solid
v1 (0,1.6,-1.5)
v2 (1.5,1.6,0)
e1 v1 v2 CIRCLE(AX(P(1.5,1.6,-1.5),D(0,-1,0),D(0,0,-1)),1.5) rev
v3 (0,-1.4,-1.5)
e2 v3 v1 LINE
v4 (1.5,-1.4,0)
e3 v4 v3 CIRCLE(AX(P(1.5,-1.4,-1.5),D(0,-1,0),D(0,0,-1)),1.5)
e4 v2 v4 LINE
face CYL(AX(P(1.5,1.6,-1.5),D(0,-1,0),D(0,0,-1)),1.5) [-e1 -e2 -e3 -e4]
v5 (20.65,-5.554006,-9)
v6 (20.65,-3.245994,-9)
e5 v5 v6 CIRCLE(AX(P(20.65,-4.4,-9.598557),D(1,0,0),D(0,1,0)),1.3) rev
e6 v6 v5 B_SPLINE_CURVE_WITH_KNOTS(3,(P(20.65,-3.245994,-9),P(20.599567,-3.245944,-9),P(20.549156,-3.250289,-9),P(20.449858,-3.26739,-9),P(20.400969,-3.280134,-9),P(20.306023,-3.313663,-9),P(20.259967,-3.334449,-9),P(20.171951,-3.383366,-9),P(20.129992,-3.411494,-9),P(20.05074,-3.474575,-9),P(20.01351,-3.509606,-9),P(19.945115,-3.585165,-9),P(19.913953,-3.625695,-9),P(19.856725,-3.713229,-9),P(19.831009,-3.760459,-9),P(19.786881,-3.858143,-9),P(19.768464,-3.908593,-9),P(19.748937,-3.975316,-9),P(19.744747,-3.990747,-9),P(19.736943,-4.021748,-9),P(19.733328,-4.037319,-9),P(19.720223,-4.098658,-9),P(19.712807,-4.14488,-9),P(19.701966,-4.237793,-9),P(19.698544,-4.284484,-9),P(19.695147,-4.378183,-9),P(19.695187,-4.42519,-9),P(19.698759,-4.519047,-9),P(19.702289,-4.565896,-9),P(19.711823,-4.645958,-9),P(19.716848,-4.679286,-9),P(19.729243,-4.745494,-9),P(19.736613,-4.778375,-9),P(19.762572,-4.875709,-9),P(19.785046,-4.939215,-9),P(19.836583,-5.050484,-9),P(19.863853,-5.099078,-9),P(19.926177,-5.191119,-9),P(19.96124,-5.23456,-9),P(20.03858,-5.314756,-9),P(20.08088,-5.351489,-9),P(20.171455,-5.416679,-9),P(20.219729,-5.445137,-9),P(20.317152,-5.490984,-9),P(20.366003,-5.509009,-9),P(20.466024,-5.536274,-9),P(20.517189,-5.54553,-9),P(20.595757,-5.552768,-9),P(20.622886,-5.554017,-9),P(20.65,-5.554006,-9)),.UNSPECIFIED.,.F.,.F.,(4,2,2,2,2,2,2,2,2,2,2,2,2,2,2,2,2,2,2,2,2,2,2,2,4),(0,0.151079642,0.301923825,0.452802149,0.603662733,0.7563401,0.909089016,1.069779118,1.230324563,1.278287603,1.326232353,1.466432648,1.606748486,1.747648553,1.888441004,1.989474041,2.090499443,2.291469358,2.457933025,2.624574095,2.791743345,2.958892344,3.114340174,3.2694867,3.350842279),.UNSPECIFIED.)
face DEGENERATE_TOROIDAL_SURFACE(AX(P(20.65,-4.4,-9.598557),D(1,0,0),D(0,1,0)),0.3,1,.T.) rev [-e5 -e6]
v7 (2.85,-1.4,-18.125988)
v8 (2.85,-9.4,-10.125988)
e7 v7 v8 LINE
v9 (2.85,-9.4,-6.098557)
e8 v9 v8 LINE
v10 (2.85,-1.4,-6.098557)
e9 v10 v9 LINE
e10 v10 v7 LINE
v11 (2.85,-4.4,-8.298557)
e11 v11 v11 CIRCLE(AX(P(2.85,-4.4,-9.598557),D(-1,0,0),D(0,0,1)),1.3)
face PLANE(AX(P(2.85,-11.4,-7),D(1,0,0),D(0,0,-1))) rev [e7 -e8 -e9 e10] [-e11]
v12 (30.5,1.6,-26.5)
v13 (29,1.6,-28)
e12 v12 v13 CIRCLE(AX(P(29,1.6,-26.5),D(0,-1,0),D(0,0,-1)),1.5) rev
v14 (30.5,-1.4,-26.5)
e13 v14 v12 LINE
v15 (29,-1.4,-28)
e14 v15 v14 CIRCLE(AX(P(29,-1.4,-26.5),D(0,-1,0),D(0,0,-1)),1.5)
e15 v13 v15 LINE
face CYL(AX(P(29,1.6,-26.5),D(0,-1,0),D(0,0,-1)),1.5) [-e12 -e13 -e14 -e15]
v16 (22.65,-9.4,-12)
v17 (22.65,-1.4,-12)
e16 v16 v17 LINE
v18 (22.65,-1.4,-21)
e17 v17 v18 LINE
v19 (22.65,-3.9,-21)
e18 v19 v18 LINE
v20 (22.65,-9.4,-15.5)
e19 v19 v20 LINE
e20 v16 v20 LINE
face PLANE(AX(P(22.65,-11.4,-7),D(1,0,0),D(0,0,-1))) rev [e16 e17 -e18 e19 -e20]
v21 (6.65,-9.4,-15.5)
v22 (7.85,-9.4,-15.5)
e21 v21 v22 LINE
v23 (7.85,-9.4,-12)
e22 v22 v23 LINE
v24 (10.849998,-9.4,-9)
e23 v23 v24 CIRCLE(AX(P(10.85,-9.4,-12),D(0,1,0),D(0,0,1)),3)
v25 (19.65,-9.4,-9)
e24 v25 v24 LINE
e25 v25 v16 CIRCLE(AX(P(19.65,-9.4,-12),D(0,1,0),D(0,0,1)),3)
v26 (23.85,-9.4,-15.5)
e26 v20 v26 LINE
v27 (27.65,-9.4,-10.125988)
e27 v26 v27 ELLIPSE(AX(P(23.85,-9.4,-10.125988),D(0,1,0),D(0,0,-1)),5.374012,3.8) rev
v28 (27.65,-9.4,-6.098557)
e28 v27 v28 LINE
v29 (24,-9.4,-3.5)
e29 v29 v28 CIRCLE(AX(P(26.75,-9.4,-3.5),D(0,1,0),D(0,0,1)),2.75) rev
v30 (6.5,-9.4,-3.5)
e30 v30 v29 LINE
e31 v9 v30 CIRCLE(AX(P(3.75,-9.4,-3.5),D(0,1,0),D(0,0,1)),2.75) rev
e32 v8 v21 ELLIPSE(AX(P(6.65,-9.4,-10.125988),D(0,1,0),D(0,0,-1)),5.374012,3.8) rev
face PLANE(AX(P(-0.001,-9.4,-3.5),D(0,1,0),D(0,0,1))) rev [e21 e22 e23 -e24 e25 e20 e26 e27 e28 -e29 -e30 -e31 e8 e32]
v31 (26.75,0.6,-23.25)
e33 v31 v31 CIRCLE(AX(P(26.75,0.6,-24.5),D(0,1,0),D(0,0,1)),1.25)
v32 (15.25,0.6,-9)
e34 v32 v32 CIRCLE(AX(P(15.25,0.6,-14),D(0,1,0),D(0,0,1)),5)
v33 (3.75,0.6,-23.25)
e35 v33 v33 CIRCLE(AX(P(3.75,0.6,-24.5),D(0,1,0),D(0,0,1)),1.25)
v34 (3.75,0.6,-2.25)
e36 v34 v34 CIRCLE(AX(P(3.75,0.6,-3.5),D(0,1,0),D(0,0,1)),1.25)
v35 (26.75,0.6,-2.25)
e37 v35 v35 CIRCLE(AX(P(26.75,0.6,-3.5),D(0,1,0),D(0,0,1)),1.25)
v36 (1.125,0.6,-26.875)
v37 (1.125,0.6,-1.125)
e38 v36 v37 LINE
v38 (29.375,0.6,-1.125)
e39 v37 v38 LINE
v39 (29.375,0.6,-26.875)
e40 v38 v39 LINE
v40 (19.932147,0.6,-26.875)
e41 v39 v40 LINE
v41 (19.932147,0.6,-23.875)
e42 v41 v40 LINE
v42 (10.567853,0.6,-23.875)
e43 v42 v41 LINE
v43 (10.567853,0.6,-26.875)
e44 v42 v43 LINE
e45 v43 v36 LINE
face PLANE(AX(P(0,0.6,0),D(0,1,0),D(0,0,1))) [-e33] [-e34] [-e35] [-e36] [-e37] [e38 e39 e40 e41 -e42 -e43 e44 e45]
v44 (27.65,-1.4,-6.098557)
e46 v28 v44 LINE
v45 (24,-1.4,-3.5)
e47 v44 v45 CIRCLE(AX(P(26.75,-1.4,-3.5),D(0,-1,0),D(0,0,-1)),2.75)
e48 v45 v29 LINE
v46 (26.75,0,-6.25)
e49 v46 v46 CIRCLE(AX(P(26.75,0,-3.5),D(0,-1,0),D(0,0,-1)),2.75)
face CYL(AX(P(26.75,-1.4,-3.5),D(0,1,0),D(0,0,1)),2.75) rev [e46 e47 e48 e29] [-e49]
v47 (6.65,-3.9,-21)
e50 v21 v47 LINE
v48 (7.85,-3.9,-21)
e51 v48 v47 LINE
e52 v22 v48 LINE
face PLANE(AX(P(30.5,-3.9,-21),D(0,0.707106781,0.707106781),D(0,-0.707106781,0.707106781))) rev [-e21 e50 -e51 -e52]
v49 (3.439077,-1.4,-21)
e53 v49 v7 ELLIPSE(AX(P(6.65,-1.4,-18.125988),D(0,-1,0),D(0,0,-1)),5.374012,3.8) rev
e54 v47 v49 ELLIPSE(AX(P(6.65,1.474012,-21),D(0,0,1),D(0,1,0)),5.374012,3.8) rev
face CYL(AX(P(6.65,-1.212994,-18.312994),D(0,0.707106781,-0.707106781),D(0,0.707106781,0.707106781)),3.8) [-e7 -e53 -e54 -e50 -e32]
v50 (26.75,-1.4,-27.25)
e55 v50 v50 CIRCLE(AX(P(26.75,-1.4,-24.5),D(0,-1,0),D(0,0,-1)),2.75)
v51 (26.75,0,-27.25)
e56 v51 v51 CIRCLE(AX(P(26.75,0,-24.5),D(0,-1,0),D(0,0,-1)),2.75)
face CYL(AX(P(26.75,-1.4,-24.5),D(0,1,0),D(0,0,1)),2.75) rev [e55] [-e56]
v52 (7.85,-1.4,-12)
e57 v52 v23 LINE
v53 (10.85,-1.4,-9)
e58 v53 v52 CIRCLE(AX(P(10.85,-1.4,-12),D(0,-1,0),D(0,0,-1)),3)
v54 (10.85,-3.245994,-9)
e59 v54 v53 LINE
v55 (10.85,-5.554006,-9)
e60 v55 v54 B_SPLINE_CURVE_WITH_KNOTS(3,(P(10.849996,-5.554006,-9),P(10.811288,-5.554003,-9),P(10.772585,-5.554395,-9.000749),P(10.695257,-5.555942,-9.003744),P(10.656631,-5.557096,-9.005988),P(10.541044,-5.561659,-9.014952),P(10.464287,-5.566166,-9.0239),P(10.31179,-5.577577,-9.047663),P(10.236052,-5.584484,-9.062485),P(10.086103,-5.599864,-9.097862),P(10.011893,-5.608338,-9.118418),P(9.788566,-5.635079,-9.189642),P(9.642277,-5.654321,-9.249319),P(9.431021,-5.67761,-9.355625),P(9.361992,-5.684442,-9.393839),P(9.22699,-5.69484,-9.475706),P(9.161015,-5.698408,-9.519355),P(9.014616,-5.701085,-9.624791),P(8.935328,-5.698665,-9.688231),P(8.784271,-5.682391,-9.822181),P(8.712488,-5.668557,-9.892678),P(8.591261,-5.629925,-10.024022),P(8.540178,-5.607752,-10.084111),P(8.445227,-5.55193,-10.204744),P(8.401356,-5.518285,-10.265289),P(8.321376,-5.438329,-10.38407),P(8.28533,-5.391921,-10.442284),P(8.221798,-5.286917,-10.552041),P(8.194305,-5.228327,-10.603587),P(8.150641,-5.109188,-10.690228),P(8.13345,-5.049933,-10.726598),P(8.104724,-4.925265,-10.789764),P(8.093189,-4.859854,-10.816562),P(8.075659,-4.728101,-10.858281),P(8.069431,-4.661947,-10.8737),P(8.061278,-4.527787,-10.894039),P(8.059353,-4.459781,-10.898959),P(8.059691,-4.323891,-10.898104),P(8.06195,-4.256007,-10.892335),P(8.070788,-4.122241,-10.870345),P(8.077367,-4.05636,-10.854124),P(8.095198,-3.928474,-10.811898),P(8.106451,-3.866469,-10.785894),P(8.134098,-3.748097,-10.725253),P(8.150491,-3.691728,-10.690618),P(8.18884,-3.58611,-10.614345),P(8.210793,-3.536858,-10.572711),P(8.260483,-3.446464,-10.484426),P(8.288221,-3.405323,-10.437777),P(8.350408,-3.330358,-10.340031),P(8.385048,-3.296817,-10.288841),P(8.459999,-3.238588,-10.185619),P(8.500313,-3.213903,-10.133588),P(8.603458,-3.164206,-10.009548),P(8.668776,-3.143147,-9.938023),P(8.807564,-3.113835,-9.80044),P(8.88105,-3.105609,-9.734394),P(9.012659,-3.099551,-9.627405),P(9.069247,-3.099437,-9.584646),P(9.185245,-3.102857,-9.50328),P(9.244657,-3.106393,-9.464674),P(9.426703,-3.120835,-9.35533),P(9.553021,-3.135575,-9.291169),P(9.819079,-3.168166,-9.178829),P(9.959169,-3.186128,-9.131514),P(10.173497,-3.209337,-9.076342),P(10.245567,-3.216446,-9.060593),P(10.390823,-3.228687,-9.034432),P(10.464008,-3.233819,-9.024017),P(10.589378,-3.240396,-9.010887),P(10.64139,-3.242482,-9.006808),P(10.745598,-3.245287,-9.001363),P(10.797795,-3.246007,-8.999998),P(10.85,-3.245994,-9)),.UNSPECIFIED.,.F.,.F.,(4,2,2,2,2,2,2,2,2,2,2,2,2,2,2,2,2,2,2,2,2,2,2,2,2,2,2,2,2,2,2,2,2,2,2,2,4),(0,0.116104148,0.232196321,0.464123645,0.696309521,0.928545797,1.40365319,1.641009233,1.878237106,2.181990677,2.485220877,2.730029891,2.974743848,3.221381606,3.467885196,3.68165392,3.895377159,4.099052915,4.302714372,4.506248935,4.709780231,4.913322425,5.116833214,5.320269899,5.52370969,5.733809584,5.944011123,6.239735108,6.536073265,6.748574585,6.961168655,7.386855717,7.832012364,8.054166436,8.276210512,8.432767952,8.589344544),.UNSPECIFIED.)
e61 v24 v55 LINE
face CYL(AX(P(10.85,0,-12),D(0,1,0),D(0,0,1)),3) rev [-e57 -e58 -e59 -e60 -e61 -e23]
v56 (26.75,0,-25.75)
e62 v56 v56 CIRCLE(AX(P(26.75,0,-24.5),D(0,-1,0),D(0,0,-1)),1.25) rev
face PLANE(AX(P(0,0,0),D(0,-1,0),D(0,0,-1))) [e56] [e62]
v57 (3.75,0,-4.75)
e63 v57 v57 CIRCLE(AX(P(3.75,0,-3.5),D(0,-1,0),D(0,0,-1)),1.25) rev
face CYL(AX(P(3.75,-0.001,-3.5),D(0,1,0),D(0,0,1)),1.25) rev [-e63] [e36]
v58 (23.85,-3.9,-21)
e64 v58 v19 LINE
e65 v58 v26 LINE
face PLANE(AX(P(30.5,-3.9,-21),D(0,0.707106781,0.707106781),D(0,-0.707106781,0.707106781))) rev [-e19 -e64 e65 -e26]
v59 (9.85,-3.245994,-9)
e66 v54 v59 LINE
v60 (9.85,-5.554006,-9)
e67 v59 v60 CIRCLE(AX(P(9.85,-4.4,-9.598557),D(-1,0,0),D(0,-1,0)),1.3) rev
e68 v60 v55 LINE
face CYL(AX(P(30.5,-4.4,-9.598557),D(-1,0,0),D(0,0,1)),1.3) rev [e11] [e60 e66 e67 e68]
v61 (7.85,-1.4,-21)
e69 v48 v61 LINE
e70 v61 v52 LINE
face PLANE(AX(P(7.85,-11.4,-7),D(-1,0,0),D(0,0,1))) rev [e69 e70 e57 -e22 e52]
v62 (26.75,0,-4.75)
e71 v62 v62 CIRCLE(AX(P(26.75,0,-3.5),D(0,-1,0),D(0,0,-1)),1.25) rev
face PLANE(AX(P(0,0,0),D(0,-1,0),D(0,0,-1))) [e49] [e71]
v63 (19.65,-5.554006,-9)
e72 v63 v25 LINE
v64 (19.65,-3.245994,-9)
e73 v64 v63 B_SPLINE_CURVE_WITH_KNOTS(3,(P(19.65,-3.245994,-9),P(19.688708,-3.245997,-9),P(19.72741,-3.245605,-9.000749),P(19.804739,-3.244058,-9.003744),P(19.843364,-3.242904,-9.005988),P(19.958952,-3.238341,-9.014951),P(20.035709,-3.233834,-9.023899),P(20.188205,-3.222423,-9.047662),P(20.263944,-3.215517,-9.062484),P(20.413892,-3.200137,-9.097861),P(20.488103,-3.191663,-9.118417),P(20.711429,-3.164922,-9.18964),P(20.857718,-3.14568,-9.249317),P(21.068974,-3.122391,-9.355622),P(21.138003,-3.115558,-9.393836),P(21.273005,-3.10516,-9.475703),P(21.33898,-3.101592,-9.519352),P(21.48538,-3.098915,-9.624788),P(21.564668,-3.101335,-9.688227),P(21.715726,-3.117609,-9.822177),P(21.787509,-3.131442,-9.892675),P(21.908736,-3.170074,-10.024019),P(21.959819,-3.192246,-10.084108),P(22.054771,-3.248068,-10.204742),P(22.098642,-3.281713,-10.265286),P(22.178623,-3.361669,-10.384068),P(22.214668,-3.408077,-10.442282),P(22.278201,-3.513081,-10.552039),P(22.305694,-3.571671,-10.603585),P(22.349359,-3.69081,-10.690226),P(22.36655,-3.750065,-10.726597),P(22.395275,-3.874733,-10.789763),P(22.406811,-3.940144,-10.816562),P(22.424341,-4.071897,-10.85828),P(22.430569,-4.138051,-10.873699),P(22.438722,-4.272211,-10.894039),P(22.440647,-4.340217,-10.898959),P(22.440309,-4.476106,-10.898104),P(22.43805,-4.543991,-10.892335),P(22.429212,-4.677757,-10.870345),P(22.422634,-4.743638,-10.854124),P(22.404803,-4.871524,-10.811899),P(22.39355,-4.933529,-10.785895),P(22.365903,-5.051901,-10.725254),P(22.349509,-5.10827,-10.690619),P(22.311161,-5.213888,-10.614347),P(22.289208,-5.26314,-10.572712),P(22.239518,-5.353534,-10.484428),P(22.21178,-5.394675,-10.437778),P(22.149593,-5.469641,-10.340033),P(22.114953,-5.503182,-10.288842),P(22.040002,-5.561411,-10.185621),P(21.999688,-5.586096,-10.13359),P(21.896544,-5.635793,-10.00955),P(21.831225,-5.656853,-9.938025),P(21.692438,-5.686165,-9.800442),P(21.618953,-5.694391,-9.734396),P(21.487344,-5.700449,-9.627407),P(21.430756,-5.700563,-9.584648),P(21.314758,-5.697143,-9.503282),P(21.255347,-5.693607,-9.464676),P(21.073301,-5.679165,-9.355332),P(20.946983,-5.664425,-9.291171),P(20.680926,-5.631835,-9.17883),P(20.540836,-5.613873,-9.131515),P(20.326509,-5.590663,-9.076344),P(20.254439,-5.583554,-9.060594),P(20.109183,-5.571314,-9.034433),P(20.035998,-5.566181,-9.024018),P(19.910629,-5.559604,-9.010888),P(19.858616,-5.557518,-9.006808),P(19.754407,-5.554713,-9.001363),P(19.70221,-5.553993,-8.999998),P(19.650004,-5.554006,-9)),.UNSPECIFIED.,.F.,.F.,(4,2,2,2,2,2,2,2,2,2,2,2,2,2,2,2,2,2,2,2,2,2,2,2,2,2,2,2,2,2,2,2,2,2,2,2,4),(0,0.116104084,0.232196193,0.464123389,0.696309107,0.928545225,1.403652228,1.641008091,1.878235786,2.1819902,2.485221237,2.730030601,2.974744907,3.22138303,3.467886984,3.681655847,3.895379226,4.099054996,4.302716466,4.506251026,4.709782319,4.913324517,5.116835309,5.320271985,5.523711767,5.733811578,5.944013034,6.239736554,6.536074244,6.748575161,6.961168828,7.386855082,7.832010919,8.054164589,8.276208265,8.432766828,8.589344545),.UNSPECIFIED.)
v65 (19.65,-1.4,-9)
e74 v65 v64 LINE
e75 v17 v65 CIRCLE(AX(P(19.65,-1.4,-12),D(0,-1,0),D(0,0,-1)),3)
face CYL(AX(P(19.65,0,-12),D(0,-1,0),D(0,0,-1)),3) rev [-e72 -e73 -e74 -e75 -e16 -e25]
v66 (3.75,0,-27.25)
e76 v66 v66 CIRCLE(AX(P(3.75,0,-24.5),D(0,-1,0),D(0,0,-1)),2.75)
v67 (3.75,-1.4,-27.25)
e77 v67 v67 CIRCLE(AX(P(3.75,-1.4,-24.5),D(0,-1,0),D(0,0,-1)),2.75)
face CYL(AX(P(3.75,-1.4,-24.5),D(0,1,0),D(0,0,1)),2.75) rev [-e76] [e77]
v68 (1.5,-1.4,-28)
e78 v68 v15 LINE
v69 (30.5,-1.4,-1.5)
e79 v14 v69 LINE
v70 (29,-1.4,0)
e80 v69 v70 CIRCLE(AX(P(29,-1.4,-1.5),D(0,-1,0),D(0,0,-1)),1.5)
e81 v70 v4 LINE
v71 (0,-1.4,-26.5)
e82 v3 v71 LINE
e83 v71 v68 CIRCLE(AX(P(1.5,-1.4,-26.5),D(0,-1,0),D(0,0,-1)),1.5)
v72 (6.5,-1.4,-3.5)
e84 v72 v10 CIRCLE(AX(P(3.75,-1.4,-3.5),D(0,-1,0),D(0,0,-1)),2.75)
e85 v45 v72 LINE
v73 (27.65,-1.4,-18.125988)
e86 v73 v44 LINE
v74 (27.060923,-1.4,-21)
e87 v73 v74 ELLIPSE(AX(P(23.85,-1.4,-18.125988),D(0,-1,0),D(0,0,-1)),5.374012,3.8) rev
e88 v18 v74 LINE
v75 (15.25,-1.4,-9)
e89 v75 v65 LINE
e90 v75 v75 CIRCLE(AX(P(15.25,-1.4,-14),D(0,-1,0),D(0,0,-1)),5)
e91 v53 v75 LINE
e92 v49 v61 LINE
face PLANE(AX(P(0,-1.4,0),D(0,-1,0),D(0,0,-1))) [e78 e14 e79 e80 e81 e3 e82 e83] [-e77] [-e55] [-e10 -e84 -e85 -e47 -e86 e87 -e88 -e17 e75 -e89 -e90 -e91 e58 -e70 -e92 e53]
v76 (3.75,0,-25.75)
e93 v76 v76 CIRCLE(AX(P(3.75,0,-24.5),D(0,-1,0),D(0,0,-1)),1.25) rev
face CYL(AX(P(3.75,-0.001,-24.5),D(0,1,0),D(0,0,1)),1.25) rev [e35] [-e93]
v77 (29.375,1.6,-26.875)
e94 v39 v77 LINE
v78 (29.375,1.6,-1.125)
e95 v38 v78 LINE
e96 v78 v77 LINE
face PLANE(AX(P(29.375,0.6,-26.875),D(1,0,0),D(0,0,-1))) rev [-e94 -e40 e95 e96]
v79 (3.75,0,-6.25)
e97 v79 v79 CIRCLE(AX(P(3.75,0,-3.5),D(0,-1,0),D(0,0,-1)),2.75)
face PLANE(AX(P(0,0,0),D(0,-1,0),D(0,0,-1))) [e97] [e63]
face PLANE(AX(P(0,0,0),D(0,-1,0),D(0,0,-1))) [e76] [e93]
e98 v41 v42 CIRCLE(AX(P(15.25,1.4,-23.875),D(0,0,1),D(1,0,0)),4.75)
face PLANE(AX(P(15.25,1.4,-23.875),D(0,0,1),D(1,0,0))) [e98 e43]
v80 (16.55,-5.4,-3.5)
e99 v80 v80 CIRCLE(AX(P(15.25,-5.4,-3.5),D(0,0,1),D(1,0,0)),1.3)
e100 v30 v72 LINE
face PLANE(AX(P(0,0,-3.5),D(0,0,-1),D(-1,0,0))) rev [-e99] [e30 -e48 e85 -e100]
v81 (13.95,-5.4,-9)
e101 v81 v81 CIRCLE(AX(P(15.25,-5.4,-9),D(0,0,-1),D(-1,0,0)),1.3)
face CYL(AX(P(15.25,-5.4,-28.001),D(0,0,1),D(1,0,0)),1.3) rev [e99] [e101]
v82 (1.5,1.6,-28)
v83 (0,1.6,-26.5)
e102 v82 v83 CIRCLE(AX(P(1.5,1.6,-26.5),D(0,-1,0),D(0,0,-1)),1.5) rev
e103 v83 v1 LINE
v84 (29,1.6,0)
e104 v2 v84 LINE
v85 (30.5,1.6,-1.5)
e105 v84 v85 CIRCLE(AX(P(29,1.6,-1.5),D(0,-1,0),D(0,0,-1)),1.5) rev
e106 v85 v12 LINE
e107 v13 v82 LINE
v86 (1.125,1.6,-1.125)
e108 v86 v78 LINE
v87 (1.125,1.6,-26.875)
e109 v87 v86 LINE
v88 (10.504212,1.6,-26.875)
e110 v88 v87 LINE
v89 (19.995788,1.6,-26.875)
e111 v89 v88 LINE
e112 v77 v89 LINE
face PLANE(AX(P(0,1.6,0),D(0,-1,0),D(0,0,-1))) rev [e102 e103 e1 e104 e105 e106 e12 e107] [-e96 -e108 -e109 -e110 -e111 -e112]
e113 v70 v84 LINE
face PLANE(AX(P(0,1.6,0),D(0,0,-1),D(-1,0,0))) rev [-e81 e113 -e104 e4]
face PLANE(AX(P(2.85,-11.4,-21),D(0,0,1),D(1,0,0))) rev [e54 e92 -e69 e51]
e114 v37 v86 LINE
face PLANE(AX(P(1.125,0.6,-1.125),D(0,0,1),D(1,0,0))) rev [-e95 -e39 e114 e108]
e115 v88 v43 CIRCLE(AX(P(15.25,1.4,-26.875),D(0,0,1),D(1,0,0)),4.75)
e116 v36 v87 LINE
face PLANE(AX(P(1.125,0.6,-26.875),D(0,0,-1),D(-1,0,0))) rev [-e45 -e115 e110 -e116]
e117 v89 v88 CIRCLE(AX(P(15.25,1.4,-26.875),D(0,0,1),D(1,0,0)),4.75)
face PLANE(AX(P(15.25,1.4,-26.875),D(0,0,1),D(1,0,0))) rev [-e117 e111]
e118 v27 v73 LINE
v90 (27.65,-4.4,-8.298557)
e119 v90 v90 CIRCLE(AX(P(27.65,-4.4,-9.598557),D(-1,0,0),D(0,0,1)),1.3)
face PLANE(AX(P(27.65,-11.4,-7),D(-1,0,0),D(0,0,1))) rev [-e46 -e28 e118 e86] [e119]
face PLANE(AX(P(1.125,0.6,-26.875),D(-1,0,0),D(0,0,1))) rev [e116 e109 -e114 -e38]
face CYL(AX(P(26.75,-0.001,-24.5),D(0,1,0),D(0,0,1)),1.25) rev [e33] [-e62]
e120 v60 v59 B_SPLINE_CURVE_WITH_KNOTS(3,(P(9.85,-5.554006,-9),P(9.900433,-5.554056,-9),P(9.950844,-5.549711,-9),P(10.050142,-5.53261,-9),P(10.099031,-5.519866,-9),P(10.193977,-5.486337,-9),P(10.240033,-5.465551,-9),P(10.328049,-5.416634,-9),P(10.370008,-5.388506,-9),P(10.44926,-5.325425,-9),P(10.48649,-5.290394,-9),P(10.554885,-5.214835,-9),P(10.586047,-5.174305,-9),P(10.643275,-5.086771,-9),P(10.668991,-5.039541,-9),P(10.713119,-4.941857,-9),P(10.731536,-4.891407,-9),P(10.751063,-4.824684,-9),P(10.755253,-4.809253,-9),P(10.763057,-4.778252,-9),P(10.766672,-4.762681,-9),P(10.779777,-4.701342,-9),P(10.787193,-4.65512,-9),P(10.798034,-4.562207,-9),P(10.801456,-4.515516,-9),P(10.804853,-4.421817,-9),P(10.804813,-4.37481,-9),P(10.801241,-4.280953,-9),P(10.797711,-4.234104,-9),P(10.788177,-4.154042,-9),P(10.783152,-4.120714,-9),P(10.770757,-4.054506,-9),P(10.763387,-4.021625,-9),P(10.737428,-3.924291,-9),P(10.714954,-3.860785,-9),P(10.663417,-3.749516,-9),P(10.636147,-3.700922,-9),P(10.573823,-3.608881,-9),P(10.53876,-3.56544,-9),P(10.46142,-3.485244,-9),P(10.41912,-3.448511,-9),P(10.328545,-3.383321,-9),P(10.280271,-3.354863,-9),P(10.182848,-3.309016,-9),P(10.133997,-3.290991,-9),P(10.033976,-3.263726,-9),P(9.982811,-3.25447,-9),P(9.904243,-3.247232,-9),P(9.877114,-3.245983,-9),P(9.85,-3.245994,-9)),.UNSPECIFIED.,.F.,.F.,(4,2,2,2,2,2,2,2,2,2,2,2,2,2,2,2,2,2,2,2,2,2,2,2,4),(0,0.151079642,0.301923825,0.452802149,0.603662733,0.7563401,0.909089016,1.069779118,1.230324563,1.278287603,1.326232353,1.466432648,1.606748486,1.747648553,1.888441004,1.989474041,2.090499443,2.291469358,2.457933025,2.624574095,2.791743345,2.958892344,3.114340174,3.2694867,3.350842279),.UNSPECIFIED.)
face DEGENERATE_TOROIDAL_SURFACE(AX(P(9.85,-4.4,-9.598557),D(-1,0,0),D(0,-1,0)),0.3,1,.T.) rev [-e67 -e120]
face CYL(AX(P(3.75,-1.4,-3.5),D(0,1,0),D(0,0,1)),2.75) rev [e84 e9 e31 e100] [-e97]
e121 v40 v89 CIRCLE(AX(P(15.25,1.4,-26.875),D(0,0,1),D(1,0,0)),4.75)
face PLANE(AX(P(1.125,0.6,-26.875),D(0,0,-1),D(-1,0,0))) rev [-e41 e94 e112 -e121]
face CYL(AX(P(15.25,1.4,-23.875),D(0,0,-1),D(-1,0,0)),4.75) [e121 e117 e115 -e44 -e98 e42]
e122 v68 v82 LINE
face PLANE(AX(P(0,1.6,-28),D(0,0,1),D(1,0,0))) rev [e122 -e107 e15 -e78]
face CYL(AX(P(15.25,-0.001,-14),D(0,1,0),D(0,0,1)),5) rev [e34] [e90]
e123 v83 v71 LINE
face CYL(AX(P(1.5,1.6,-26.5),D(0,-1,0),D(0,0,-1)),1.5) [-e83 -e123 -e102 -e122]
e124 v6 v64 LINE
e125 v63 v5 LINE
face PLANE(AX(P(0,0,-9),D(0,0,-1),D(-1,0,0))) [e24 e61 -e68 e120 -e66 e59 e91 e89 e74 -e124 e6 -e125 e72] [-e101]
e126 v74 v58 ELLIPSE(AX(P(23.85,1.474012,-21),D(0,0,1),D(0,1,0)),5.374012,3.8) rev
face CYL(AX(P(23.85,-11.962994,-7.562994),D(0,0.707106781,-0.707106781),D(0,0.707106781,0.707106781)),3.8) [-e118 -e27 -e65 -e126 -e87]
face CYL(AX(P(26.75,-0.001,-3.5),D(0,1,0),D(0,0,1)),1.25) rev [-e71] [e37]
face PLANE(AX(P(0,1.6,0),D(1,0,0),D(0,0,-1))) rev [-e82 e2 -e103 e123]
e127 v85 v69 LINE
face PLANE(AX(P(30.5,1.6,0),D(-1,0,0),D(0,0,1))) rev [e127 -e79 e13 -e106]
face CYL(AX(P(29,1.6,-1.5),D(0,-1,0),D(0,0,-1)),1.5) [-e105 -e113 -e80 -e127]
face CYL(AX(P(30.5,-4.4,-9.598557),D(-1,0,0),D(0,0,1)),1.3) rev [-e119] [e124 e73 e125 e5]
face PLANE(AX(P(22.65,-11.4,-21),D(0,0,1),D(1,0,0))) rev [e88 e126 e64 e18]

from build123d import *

# Parameters (mm, degrees)
SKETCH_1_W           = 30.5
SKETCH_1_H           = 28
EXTRUDE_1_DEPTH      = 1.6
SKETCH_2_W           = 28.25
SKETCH_2_H           = 25.75
CUT_EXTRUDE_1_DEPTH  = 1
EXTRUDE_2_DEPTH      = 3
CUT_EXTRUDE_2_REACH  = 43.774
SKETCH_5_R           = 1.25
CUT_EXTRUDE_3_REACH  = 43.774
SKETCH_6_R           = 5
SKETCH_7_W           = 30.5
SKETCH_7_H           = 28
SKETCH_7_R           = 2.75
SKETCH_7_R_2         = 5
EXTRUDE_3_DEPTH      = 1.4
SKETCH_8_W           = 5
SKETCH_8_H           = 14
EXTRUDE_4_DEPTH      = 10
CUT_EXTRUDE_4_DEPTH  = 41.969287277
SKETCH_10_W          = 24.8
SKETCH_10_H          = 10
EXTRUDE_5_DEPTH      = 3.5
SKETCH_11_R          = 2.75
CUT_EXTRUDE_5_DEPTH  = 43.944266206
SKETCH_12_R          = 1.3
CUT_EXTRUDE_6_DEPTH  = 41.969287277
CUT_EXTRUDE_7_REACH  = 42.749
SKETCH_13_R          = 1.3
CUT_EXTRUDE_8_REACH  = 42.969
SKETCH_14_W          = 12
SKETCH_14_H          = 2
SKETCH_15_W          = 14.8
SKETCH_15_H          = 8
SKETCH_15_R          = 1.3
EXTRUDE_6_DEPTH      = 2
FILLET_1_R           = 3.8
FILLET_2_R           = 1.5
FILLET_3_R           = 3
CUT_EXTRUDE_START    = -3
CUT_EXTRUDE_9_DEPTH  = 3
CUT_EXTRUDE_10_DEPTH = 3
FILLET_4_R           = 1


with BuildPart() as part:
    # 草图1 → 凸台-拉伸1 (new body)
    with BuildSketch(Plane(origin=(0, 0, 0), x_dir=(1, 0, 0), z_dir=(0, 1, 0))):
        with Locations((15.25, 14)):
            Rectangle(SKETCH_1_W, SKETCH_1_H)
    extrude(amount=EXTRUDE_1_DEPTH)

    # 草图2 → 切除-拉伸1 (cut)
    with BuildSketch(Plane(origin=(0, 1.6, 0), x_dir=(1, 0, 0), z_dir=(0, 1, 0))):
        with Locations((15.25, 14)):
            Rectangle(SKETCH_2_W, SKETCH_2_H)
    extrude(amount=-CUT_EXTRUDE_1_DEPTH, mode=Mode.SUBTRACT)

    # 草图3 → 凸台-拉伸2 (add)
    with BuildSketch(Plane(origin=(57.75, 0, -26.875), x_dir=(1, 0, 0), z_dir=(0, 0, 1))):
        with BuildLine():
            Line((-47.182146943, 0.6), (-37.817853057, 0.6))
            ThreePointArc((-37.817853057, 0.6), (-42.5, 6.15), (-47.182146943, 0.6))
        make_face()
    extrude(amount=EXTRUDE_2_DEPTH)

    # 草图5 → 切除-拉伸2 (cut, up to next)
    with BuildSketch(Plane(origin=(0, 0.6, 0), x_dir=(1, 0, 0), z_dir=(0, 1, 0)), mode=Mode.PRIVATE) as cut_extrude_2_sk1:
        with Locations(Location((3.75, 24.5, 0), (0, 0, 270))):
            Circle(SKETCH_5_R)
    cut_extrude_2_tool1 = extrude(cut_extrude_2_sk1.sketch, amount=-CUT_EXTRUDE_2_REACH, mode=Mode.PRIVATE) & part.part
    # 草图5 → 切除-拉伸2 (cut, up to next)
    with BuildSketch(Plane(origin=(0, 0.6, 0), x_dir=(1, 0, 0), z_dir=(0, 1, 0)), mode=Mode.PRIVATE) as cut_extrude_2_sk2:
        with Locations(Location((26.75, 24.5, 0), (0, 0, 270))):
            Circle(SKETCH_5_R)
    cut_extrude_2_tool2 = extrude(cut_extrude_2_sk2.sketch, amount=-CUT_EXTRUDE_2_REACH, mode=Mode.PRIVATE) & part.part
    # 草图5 → 切除-拉伸2 (cut, up to next)
    with BuildSketch(Plane(origin=(0, 0.6, 0), x_dir=(1, 0, 0), z_dir=(0, 1, 0)), mode=Mode.PRIVATE) as cut_extrude_2_sk3:
        with Locations(Location((3.75, 3.5, 0), (0, 0, 270))):
            Circle(SKETCH_5_R)
    cut_extrude_2_tool3 = extrude(cut_extrude_2_sk3.sketch, amount=-CUT_EXTRUDE_2_REACH, mode=Mode.PRIVATE) & part.part
    # 草图5 → 切除-拉伸2 (cut, up to next)
    with BuildSketch(Plane(origin=(0, 0.6, 0), x_dir=(1, 0, 0), z_dir=(0, 1, 0)), mode=Mode.PRIVATE) as cut_extrude_2_sk4:
        with Locations(Location((26.75, 3.5, 0), (0, 0, 270))):
            Circle(SKETCH_5_R)
    cut_extrude_2_tool4 = extrude(cut_extrude_2_sk4.sketch, amount=-CUT_EXTRUDE_2_REACH, mode=Mode.PRIVATE) & part.part
    add(cut_extrude_2_tool1.solids().sort_by_distance((3.75, 0.6, -24.5))[0], mode=Mode.SUBTRACT)
    add(cut_extrude_2_tool2.solids().sort_by_distance((26.75, 0.6, -24.5))[0], mode=Mode.SUBTRACT)
    add(cut_extrude_2_tool3.solids().sort_by_distance((3.75, 0.6, -3.5))[0], mode=Mode.SUBTRACT)
    add(cut_extrude_2_tool4.solids().sort_by_distance((26.75, 0.6, -3.5))[0], mode=Mode.SUBTRACT)

    # 草图6 → 切除-拉伸3 (cut, up to next)
    with BuildSketch(Plane(origin=(0, 0.6, 0), x_dir=(1, 0, 0), z_dir=(0, 1, 0)), mode=Mode.PRIVATE) as cut_extrude_3_sk1:
        with Locations(Location((15.25, 14, 0), (0, 0, 270))):
            Circle(SKETCH_6_R)
    cut_extrude_3_tool1 = extrude(cut_extrude_3_sk1.sketch, amount=-CUT_EXTRUDE_3_REACH, mode=Mode.PRIVATE) & part.part
    add(cut_extrude_3_tool1.solids().sort_by_distance((15.25, 0.6, -14))[0], mode=Mode.SUBTRACT)

    # 草图7 → 凸台-拉伸3 (add)
    with BuildSketch(Plane.XZ):
        with Locations((15.25, -14)):
            Rectangle(SKETCH_7_W, SKETCH_7_H)
        with Locations(Location((3.75, -3.5, 0), (0, 0, 270))):
            Circle(SKETCH_7_R, mode=Mode.SUBTRACT)
        with Locations(Location((26.75, -3.5, 0), (0, 0, 270))):
            Circle(SKETCH_7_R, mode=Mode.SUBTRACT)
        with Locations(Location((3.75, -24.5, 0), (0, 0, 270))):
            Circle(SKETCH_7_R, mode=Mode.SUBTRACT)
        with Locations(Location((26.75, -24.5, 0), (0, 0, 270))):
            Circle(SKETCH_7_R, mode=Mode.SUBTRACT)
        with Locations(Location((15.25, -14, 0), (0, 0, 90))):
            Circle(SKETCH_7_R_2, mode=Mode.SUBTRACT)
    extrude(amount=EXTRUDE_3_DEPTH)

    # 草图8 → 凸台-拉伸4 (add)
    with BuildSketch(Plane.XZ.offset(1.4)):
        with Locations((25.15, -14)):
            Rectangle(SKETCH_8_W, SKETCH_8_H)
        with Locations((5.35, -14)):
            Rectangle(SKETCH_8_W, SKETCH_8_H)
    extrude(amount=EXTRUDE_4_DEPTH)

    # 草图9 → 切除-拉伸4 (cut, through all)
    with BuildSketch(Plane.ZY.offset(-2.85)):
        Polygon((-21, -3.9), (-13.5, -11.4), (-21, -11.4), align=None)
    extrude(amount=-CUT_EXTRUDE_4_DEPTH, mode=Mode.SUBTRACT)

    # 草图10 → 凸台-拉伸5 (add)
    with BuildSketch(Plane.XY.offset(-7)):
        with Locations((15.25, -6.4)):
            Rectangle(SKETCH_10_W, SKETCH_10_H)
    extrude(amount=EXTRUDE_5_DEPTH)

    # 草图11 → 切除-拉伸5 (cut, through all)
    with BuildSketch(Plane.XZ):
        with Locations(Location((26.75, -3.5, 0), (0, 0, 180))):
            Circle(SKETCH_11_R)
        with Locations((3.75, -3.5)):
            Circle(SKETCH_11_R)
    extrude(amount=CUT_EXTRUDE_5_DEPTH, mode=Mode.SUBTRACT)

    # 草图12 → 切除-拉伸6 (cut, through all)
    with BuildSketch(Plane.ZY.offset(-2.85)):
        with Locations((-9.598557292, -4.4)):
            Circle(SKETCH_12_R)
    extrude(amount=-CUT_EXTRUDE_6_DEPTH, mode=Mode.SUBTRACT)

    # 草图13 → 切除-拉伸7 (cut, up to next)
    with BuildSketch(Plane.XY.offset(-3.5), mode=Mode.PRIVATE) as cut_extrude_7_sk1:
        with Locations((15.25, -5.4)):
            Circle(SKETCH_13_R)
    cut_extrude_7_tool1 = extrude(cut_extrude_7_sk1.sketch, amount=-CUT_EXTRUDE_7_REACH, mode=Mode.PRIVATE) & part.part
    add(cut_extrude_7_tool1.solids().sort_by_distance((15.25, -5.4, -3.5))[0], mode=Mode.SUBTRACT)

    # 草图14 → 切除-拉伸8 (cut, up to next)
    with BuildSketch(Plane(origin=(27.65, 0, 0), x_dir=(0, 0, -1), z_dir=(1, 0, 0)), mode=Mode.PRIVATE) as cut_extrude_8_sk1:
        with Locations((9.5, -10.4)):
            Rectangle(SKETCH_14_W, SKETCH_14_H)
    cut_extrude_8_tool1 = extrude(cut_extrude_8_sk1.sketch, amount=-CUT_EXTRUDE_8_REACH, mode=Mode.PRIVATE) & part.part
    add(cut_extrude_8_tool1.solids().sort_by_distance((27.65, -10.4, -9.5))[0], mode=Mode.SUBTRACT)

    # 草图15 → 凸台-拉伸6 (add)
    with BuildSketch(Plane(origin=(0, 0, -7), x_dir=(-1, 0, 0), z_dir=(0, 0, -1))):
        with Locations((-15.25, -5.4)):
            Rectangle(SKETCH_15_W, SKETCH_15_H)
        with Locations(Location((-15.25, -5.4, 0), (0, 0, 180))):
            Circle(SKETCH_15_R, mode=Mode.SUBTRACT)
    extrude(amount=EXTRUDE_6_DEPTH)

    # 圆角1
    fillet_1_edges = [part.edges().sort_by_distance(p)[0] for p in [
        (27.65, -6.65, -18.25),
        (2.85, -6.65, -18.25),
    ]]
    fillet(fillet_1_edges, radius=FILLET_1_R)

    # 圆角2
    fillet_2_edges = [part.edges().sort_by_distance(p)[0] for p in [
        (0, 0.1, -28),
        (30.5, 0.1, -28),
        (30.5, 0.1, 0),
        (0, 0.1, 0),
    ]]
    fillet(fillet_2_edges, radius=FILLET_2_R)

    # 圆角3
    # the kernel refuses this fillet: 3 mm, written as the material it adds along each edge
    with BuildSketch(Plane(origin=(22.65, 6.1, -9), x_dir=(0, 0, -1), z_dir=(0, -1, 0))) as fillet_3_piece_1_section:
        with BuildLine():
            CenterArc((FILLET_3_R, -FILLET_3_R), FILLET_3_R, 90, 90)
            Line((0, -FILLET_3_R), (0, 0))
            Line((0, 0), (FILLET_3_R, 0))
        make_face()
    fillet_3_piece_1 = extrude(amount=16.845994295, mode=Mode.PRIVATE)
    fillet_3_piece_1 = split(fillet_3_piece_1, bisect_by=Plane(origin=(22.65, -9.4, -9), z_dir=(0, 1, 0)), keep=Keep.TOP, mode=Mode.PRIVATE)
    fillet_3_piece_1 = fillet_3_piece_1 - Plane(origin=(22.65, -4.4, -9.598557292), x_dir=(0, 0, 1), z_dir=(-1, 0, 0)) * Cylinder(1.3, 46, mode=Mode.PRIVATE)
    fillet_3_piece_1 = split(fillet_3_piece_1, bisect_by=Plane(origin=(22.65, 0.6, -9), z_dir=(0, -1, 0)), keep=Keep.TOP, mode=Mode.PRIVATE)
    add(fillet_3_piece_1)
    with BuildSketch(Plane(origin=(7.85, -10.745994295, -9), x_dir=(1, 0, 0), z_dir=(0, 1, 0))) as fillet_3_piece_2_section:
        with BuildLine():
            CenterArc((FILLET_3_R, FILLET_3_R), FILLET_3_R, 180, 90)
            Line((0, FILLET_3_R), (0, 0))
            Line((0, 0), (FILLET_3_R, 0))
        make_face()
    fillet_3_piece_2 = extrude(amount=16.845994295, mode=Mode.PRIVATE)
    fillet_3_piece_2 = split(fillet_3_piece_2, bisect_by=Plane(origin=(7.85, -9.4, -9), z_dir=(0, 1, 0)), keep=Keep.TOP, mode=Mode.PRIVATE)
    fillet_3_piece_2 = fillet_3_piece_2 - Plane(origin=(7.85, -4.4, -9.598557292), x_dir=(0, 0, 1), z_dir=(-1, 0, 0)) * Cylinder(1.3, 46, mode=Mode.PRIVATE)
    fillet_3_piece_2 = split(fillet_3_piece_2, bisect_by=Plane(origin=(7.85, 0.6, -9), z_dir=(0, -1, 0)), keep=Keep.TOP, mode=Mode.PRIVATE)
    add(fillet_3_piece_2)

    # 草图16 → 切除-拉伸9 (cut)
    with BuildSketch(Plane(origin=(22.65, 0, 0), x_dir=(0, 0, -1), z_dir=(1, 0, 0)).offset(CUT_EXTRUDE_START)):
        with BuildLine():
            Line((9, -5.554005705), (9, -3.245994295))
            ThreePointArc((9, -3.245994295), (8.298557292, -4.4), (9, -5.554005705))
        make_face()
    extrude(amount=CUT_EXTRUDE_9_DEPTH, mode=Mode.SUBTRACT)

    # 草图17 → 切除-拉伸10 (cut)
    with BuildSketch(Plane.ZY.offset(-7.85)):
        with BuildLine():
            Line((-9, -3.245994295), (-9, -5.554005705))
            ThreePointArc((-9, -5.554005705), (-8.298557292, -4.4), (-9, -3.245994295))
        make_face()
    extrude(amount=-CUT_EXTRUDE_10_DEPTH, mode=Mode.SUBTRACT)

    # 圆角4
    # the kernel refuses this fillet: 1 mm, written as the material it adds along each edge
    with BuildSketch(Plane(origin=(10.85, -4.4, -9.598557292), x_dir=(0, -0.12437985627786666, -0.9922346755441966), z_dir=(0, 0.9922346755441966, -0.12437985627786666))) as fillet_4_piece_1_section:
        with BuildLine():
            CenterArc((1.3 - FILLET_4_R, FILLET_4_R), FILLET_4_R, 270, 90)
            Line((1.3 - FILLET_4_R, 0), (1.3, 0))
            Line((1.3, 0), (1.3, FILLET_4_R))
        make_face()
    fillet_4_piece_1 = revolve(axis=Axis((10.85, -4.4, -9.598557292), (-1, 0, 0)), revolution_arc=345.710110631, mode=Mode.PRIVATE)
    fillet_4_piece_1 = split(fillet_4_piece_1, bisect_by=Plane(origin=(10.85, -4.4, -9), z_dir=(0, 0, 1)), keep=Keep.TOP, mode=Mode.PRIVATE)
    add(fillet_4_piece_1)
    with BuildSketch(Plane(origin=(19.65, -4.4, -9.598557292), x_dir=(0, 0.12437985627786262, -0.9922346755441972), z_dir=(0, -0.9922346755441972, -0.12437985627786262))) as fillet_4_piece_2_section:
        with BuildLine():
            CenterArc((1.3 - FILLET_4_R, FILLET_4_R), FILLET_4_R, 270, 90)
            Line((1.3, FILLET_4_R), (1.3, 0))
            Line((1.3, 0), (1.3 - FILLET_4_R, 0))
        make_face()
    fillet_4_piece_2 = revolve(axis=Axis((19.65, -4.4, -9.598557292), (1, 0, 0)), revolution_arc=345.710110631, mode=Mode.PRIVATE)
    fillet_4_piece_2 = split(fillet_4_piece_2, bisect_by=Plane(origin=(19.65, -4.4, -9), z_dir=(0, 0, 1)), keep=Keep.TOP, mode=Mode.PRIVATE)
    add(fillet_4_piece_2)


solid = part.part
